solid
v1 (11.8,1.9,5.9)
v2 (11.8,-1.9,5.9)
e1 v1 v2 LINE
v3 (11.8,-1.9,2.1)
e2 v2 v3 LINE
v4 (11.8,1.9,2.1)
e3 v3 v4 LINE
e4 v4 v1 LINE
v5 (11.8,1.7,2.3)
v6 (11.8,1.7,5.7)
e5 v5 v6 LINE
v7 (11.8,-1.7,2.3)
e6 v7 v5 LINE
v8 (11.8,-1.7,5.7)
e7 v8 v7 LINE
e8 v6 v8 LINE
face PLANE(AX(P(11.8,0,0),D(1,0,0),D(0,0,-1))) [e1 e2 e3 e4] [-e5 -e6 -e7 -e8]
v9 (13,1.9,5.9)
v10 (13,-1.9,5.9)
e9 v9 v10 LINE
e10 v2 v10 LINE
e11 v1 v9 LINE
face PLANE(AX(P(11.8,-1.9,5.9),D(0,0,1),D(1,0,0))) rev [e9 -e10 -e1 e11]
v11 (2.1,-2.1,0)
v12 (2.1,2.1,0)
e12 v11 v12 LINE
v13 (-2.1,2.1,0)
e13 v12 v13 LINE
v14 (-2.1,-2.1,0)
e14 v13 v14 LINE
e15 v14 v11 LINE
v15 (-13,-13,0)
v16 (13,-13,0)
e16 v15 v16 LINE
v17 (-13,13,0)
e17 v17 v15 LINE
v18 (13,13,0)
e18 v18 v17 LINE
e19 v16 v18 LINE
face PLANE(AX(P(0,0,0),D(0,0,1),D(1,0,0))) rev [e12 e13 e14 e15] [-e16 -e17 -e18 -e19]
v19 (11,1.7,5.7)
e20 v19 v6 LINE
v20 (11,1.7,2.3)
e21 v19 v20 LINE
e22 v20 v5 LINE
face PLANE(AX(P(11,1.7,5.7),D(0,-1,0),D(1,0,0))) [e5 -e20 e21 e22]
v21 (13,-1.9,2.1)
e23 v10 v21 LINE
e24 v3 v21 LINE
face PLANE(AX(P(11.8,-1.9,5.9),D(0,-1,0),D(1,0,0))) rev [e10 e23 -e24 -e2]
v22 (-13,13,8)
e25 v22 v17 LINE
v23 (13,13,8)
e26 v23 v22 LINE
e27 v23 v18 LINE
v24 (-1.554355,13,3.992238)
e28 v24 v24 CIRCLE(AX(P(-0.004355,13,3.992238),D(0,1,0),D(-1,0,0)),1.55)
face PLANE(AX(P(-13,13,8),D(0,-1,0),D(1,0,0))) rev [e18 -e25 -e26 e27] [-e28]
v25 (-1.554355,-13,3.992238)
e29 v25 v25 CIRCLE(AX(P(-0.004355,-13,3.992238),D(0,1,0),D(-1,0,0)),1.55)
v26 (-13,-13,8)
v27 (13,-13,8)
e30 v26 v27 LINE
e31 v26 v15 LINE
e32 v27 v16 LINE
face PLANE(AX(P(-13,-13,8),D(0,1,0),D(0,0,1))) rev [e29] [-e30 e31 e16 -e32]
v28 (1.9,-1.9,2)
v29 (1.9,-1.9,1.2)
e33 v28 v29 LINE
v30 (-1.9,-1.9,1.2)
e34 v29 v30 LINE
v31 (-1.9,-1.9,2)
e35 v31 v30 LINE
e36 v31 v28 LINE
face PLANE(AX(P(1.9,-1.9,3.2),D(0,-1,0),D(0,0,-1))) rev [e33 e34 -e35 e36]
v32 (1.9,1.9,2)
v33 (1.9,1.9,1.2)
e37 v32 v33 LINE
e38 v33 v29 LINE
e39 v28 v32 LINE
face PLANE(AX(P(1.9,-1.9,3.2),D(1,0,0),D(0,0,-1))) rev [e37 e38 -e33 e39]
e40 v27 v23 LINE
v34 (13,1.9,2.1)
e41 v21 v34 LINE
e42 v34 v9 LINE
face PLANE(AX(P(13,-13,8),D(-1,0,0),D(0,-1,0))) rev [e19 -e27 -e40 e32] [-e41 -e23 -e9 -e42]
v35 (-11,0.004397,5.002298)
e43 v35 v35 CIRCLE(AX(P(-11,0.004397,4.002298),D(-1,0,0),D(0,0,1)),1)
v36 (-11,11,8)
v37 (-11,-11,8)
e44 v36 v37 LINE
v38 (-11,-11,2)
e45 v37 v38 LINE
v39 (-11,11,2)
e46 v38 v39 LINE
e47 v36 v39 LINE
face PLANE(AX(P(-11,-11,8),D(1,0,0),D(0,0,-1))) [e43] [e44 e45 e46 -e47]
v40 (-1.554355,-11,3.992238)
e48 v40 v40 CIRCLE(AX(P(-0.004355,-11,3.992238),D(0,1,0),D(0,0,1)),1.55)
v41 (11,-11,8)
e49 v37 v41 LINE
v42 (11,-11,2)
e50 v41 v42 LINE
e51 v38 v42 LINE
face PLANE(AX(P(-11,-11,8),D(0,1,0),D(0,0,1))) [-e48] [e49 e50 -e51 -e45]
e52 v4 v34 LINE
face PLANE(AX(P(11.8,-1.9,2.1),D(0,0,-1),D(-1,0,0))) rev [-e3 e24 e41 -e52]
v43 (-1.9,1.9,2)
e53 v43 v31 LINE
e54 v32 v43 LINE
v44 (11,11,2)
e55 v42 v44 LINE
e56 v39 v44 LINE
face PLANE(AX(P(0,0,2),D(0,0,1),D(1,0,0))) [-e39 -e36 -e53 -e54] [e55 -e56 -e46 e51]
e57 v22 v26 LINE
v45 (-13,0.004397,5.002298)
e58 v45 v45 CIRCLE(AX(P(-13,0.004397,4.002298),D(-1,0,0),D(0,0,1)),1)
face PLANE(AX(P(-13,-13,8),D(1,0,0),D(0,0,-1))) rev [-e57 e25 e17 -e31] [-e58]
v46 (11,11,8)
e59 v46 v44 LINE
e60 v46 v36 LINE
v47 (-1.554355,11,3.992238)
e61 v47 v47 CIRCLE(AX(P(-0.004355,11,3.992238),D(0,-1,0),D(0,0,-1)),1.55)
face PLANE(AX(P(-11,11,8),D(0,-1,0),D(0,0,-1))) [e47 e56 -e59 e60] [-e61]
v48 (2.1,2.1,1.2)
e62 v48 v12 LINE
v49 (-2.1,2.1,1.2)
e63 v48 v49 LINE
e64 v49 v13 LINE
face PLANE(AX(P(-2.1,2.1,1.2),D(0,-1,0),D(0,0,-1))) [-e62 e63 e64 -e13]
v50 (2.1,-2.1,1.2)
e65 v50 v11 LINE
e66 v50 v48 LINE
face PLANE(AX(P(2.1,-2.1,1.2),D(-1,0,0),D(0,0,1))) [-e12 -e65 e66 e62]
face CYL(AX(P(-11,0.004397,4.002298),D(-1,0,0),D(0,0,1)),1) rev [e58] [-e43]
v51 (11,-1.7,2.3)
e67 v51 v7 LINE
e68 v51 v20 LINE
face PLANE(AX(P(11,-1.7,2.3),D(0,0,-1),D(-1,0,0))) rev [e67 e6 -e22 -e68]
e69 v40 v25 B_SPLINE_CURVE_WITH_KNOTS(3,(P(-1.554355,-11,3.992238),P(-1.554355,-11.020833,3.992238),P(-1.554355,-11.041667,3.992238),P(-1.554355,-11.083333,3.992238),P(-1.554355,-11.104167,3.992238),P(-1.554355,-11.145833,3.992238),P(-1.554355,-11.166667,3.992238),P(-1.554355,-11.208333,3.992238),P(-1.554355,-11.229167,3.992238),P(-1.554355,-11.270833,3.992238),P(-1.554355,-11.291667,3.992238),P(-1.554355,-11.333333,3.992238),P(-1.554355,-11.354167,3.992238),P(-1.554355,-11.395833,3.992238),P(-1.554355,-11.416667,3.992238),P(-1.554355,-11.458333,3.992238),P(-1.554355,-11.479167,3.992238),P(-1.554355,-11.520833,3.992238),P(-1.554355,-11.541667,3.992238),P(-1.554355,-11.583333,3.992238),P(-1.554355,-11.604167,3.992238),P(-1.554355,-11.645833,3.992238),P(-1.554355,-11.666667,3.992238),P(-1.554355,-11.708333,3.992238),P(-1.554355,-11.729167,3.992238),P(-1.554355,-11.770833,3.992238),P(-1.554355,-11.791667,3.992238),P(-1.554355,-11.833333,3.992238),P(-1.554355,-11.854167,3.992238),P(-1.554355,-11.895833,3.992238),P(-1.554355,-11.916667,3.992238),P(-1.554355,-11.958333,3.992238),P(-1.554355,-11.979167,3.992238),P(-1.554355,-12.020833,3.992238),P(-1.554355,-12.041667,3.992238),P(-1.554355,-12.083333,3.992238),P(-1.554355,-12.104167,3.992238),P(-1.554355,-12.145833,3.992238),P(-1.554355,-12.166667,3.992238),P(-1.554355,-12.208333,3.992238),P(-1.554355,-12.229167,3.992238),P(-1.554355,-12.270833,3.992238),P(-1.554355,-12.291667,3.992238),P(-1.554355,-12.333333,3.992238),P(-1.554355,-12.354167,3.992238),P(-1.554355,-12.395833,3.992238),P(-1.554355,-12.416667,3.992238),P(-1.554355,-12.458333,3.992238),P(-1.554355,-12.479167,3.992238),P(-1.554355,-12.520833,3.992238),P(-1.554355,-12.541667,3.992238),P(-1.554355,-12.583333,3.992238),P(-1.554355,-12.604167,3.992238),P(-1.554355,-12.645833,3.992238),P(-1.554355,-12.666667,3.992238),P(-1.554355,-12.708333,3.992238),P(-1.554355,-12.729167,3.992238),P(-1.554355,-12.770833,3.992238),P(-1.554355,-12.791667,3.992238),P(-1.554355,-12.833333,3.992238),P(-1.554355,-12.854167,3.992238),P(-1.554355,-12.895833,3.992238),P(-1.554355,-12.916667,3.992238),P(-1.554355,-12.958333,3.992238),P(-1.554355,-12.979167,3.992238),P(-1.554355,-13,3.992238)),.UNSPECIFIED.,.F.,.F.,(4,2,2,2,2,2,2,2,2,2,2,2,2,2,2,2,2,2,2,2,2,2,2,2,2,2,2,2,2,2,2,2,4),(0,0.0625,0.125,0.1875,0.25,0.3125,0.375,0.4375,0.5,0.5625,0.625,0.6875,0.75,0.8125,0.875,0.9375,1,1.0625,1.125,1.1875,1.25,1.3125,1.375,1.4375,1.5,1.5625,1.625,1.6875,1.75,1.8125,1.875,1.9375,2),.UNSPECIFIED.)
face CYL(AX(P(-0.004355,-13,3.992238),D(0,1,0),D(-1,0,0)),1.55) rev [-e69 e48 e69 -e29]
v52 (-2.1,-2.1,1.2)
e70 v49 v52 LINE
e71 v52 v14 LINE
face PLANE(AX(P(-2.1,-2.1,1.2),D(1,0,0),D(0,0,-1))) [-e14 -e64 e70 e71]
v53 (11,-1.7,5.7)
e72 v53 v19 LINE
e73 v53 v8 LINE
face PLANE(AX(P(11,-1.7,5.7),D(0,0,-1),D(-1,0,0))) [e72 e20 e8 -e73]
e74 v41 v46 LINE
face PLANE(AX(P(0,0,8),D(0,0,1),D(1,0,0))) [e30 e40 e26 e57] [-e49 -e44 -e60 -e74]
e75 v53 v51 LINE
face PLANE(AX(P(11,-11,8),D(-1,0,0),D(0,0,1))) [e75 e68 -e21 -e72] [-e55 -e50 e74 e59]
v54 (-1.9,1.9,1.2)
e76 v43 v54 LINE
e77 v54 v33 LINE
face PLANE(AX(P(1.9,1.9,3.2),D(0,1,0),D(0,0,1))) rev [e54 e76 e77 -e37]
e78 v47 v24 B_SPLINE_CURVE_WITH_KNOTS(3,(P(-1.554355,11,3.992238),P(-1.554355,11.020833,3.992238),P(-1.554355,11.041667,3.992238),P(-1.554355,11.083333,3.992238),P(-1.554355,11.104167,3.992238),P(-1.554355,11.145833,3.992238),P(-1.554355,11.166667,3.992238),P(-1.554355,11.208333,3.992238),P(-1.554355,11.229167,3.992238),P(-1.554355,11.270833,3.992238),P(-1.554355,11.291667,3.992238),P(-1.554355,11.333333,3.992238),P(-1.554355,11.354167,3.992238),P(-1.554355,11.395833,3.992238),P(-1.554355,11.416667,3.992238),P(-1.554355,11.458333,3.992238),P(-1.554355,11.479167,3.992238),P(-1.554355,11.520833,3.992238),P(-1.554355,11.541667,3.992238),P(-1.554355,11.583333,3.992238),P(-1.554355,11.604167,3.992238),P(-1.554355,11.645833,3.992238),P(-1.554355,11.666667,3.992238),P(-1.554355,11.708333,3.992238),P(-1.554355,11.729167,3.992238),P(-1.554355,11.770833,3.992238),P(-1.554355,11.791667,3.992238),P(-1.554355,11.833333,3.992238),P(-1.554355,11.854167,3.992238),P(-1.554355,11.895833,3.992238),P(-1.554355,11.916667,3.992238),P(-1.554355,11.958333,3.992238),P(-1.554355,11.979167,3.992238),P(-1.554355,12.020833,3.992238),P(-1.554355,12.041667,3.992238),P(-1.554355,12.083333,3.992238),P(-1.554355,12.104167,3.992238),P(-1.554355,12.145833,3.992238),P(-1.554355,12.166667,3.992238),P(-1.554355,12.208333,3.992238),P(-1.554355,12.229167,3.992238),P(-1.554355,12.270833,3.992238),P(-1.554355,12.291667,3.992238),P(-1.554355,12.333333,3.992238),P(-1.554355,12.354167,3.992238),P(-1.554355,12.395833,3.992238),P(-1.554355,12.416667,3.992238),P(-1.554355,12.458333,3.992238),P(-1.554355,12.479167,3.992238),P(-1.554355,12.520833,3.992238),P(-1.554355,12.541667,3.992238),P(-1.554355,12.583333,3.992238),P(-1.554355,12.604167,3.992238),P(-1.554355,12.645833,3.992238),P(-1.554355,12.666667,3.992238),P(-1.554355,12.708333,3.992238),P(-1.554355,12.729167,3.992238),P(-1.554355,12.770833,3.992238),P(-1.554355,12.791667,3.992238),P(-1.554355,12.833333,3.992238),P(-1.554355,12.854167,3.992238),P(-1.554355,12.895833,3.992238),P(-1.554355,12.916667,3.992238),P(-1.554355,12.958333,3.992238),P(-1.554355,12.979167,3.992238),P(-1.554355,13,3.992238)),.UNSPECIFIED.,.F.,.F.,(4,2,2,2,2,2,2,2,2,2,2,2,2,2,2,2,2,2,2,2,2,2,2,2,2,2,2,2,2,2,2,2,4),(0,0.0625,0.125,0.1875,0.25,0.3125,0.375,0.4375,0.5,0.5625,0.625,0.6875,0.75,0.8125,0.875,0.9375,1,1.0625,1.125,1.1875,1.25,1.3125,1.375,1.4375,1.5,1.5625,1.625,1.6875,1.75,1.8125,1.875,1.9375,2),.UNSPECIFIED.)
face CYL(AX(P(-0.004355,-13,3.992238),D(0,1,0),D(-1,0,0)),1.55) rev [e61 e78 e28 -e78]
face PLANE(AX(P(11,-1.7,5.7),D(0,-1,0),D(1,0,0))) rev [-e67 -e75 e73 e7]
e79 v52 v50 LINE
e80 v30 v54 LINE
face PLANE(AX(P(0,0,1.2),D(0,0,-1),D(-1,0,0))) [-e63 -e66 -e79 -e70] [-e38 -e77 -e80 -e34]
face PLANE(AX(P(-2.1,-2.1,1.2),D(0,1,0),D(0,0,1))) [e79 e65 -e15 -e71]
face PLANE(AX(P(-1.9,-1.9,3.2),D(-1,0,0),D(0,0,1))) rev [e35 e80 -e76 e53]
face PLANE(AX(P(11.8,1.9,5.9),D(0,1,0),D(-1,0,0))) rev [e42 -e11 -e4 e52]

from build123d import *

# Parameters (mm, degrees)
SKETCH1_W            = 26
SKETCH1_H            = 26
SKETCH1_W_2          = 22
SKETCH1_H_2          = 22
BOSS_EXTRUDE16_DEPTH = 8
SKETCH1_5_W          = 22
SKETCH1_5_H          = 22
BOSS_EXTRUDE17_DEPTH = 2
SKETCH4_W            = 4.2
SKETCH4_H            = 4.2
CUT_EXTRUDE3_DEPTH   = 1.2
SKETCH8_W            = 3.8
SKETCH8_H            = 3.8
CUT_EXTRUDE4_DEPTH   = 2
HOLE2_START          = -13
HOLE2_OUTLINE_R      = 1.55
HOLE2_DEPTH          = 26
HOLE4_START          = -13
HOLE4_OUTLINE_R      = 1
HOLE4_DEPTH          = 2
SKETCH15_W           = 3.4
SKETCH15_H           = 3.4
CUT_EXTRUDE25_DEPTH  = 2
SKETCH15_6_W         = 3.8
SKETCH15_6_H         = 3.8
SKETCH15_6_W_2       = 3.4
SKETCH15_6_H_2       = 3.4
CUT_EXTRUDE26_DEPTH  = 1.2


# Read off the part's stored shape, not the designer's step: Hole2, Hole4
with BuildPart() as part:
    # Sketch1 → Boss-Extrude16 (new body)
    with BuildSketch(Plane.XY):
        Rectangle(SKETCH1_W, SKETCH1_H)
        Rectangle(SKETCH1_W_2, SKETCH1_H_2, mode=Mode.SUBTRACT)
    extrude(amount=BOSS_EXTRUDE16_DEPTH)

    # Sketch1<5> → Boss-Extrude17 (add)
    with BuildSketch(Plane.XY):
        Rectangle(SKETCH1_5_W, SKETCH1_5_H)
    extrude(amount=BOSS_EXTRUDE17_DEPTH)

    # Sketch4 → Cut-Extrude3 (cut)
    with BuildSketch(Plane.XY):
        Rectangle(SKETCH4_W, SKETCH4_H)
    extrude(amount=CUT_EXTRUDE3_DEPTH, mode=Mode.SUBTRACT)

    # Sketch8 → Cut-Extrude4 (cut)
    with BuildSketch(Plane(origin=(0, 0, 1.2), x_dir=(-1, 0, 0), z_dir=(0, 0, -1))):
        Rectangle(SKETCH8_W, SKETCH8_H)
    extrude(amount=-CUT_EXTRUDE4_DEPTH, mode=Mode.SUBTRACT)

    # Hole2 outline → Hole2 (cut)
    with BuildSketch(Plane(origin=(0, 0, 0), x_dir=(1, 0, 0), z_dir=(0, 1, 0)).offset(HOLE2_START)):
        with Locations((-0.00435538, -3.992237836)):
            Circle(HOLE2_OUTLINE_R)
    extrude(amount=HOLE2_DEPTH, mode=Mode.SUBTRACT)

    # Hole4 outline → Hole4 (cut)
    with BuildSketch(Plane.YZ.offset(HOLE4_START)):
        with Locations((0.004397166, 4.002298356)):
            Circle(HOLE4_OUTLINE_R)
    extrude(amount=HOLE4_DEPTH, mode=Mode.SUBTRACT)

    # Sketch15 → Cut-Extrude25 (cut)
    with BuildSketch(Plane(origin=(13, 0, 0), x_dir=(0, 0, -1), z_dir=(1, 0, 0))):
        with Locations((-4, 0)):
            Rectangle(SKETCH15_W, SKETCH15_H)
    extrude(amount=-CUT_EXTRUDE25_DEPTH, mode=Mode.SUBTRACT)

    # Sketch15<6> → Cut-Extrude26 (cut)
    with BuildSketch(Plane(origin=(13, 0, 0), x_dir=(0, 0, -1), z_dir=(1, 0, 0))):
        with Locations((-4, 0)):
            Rectangle(SKETCH15_6_W, SKETCH15_6_H)
        with Locations((-4, 0)):
            Rectangle(SKETCH15_6_W_2, SKETCH15_6_H_2, mode=Mode.SUBTRACT)
    extrude(amount=-CUT_EXTRUDE26_DEPTH, mode=Mode.SUBTRACT)


solid = part.part
